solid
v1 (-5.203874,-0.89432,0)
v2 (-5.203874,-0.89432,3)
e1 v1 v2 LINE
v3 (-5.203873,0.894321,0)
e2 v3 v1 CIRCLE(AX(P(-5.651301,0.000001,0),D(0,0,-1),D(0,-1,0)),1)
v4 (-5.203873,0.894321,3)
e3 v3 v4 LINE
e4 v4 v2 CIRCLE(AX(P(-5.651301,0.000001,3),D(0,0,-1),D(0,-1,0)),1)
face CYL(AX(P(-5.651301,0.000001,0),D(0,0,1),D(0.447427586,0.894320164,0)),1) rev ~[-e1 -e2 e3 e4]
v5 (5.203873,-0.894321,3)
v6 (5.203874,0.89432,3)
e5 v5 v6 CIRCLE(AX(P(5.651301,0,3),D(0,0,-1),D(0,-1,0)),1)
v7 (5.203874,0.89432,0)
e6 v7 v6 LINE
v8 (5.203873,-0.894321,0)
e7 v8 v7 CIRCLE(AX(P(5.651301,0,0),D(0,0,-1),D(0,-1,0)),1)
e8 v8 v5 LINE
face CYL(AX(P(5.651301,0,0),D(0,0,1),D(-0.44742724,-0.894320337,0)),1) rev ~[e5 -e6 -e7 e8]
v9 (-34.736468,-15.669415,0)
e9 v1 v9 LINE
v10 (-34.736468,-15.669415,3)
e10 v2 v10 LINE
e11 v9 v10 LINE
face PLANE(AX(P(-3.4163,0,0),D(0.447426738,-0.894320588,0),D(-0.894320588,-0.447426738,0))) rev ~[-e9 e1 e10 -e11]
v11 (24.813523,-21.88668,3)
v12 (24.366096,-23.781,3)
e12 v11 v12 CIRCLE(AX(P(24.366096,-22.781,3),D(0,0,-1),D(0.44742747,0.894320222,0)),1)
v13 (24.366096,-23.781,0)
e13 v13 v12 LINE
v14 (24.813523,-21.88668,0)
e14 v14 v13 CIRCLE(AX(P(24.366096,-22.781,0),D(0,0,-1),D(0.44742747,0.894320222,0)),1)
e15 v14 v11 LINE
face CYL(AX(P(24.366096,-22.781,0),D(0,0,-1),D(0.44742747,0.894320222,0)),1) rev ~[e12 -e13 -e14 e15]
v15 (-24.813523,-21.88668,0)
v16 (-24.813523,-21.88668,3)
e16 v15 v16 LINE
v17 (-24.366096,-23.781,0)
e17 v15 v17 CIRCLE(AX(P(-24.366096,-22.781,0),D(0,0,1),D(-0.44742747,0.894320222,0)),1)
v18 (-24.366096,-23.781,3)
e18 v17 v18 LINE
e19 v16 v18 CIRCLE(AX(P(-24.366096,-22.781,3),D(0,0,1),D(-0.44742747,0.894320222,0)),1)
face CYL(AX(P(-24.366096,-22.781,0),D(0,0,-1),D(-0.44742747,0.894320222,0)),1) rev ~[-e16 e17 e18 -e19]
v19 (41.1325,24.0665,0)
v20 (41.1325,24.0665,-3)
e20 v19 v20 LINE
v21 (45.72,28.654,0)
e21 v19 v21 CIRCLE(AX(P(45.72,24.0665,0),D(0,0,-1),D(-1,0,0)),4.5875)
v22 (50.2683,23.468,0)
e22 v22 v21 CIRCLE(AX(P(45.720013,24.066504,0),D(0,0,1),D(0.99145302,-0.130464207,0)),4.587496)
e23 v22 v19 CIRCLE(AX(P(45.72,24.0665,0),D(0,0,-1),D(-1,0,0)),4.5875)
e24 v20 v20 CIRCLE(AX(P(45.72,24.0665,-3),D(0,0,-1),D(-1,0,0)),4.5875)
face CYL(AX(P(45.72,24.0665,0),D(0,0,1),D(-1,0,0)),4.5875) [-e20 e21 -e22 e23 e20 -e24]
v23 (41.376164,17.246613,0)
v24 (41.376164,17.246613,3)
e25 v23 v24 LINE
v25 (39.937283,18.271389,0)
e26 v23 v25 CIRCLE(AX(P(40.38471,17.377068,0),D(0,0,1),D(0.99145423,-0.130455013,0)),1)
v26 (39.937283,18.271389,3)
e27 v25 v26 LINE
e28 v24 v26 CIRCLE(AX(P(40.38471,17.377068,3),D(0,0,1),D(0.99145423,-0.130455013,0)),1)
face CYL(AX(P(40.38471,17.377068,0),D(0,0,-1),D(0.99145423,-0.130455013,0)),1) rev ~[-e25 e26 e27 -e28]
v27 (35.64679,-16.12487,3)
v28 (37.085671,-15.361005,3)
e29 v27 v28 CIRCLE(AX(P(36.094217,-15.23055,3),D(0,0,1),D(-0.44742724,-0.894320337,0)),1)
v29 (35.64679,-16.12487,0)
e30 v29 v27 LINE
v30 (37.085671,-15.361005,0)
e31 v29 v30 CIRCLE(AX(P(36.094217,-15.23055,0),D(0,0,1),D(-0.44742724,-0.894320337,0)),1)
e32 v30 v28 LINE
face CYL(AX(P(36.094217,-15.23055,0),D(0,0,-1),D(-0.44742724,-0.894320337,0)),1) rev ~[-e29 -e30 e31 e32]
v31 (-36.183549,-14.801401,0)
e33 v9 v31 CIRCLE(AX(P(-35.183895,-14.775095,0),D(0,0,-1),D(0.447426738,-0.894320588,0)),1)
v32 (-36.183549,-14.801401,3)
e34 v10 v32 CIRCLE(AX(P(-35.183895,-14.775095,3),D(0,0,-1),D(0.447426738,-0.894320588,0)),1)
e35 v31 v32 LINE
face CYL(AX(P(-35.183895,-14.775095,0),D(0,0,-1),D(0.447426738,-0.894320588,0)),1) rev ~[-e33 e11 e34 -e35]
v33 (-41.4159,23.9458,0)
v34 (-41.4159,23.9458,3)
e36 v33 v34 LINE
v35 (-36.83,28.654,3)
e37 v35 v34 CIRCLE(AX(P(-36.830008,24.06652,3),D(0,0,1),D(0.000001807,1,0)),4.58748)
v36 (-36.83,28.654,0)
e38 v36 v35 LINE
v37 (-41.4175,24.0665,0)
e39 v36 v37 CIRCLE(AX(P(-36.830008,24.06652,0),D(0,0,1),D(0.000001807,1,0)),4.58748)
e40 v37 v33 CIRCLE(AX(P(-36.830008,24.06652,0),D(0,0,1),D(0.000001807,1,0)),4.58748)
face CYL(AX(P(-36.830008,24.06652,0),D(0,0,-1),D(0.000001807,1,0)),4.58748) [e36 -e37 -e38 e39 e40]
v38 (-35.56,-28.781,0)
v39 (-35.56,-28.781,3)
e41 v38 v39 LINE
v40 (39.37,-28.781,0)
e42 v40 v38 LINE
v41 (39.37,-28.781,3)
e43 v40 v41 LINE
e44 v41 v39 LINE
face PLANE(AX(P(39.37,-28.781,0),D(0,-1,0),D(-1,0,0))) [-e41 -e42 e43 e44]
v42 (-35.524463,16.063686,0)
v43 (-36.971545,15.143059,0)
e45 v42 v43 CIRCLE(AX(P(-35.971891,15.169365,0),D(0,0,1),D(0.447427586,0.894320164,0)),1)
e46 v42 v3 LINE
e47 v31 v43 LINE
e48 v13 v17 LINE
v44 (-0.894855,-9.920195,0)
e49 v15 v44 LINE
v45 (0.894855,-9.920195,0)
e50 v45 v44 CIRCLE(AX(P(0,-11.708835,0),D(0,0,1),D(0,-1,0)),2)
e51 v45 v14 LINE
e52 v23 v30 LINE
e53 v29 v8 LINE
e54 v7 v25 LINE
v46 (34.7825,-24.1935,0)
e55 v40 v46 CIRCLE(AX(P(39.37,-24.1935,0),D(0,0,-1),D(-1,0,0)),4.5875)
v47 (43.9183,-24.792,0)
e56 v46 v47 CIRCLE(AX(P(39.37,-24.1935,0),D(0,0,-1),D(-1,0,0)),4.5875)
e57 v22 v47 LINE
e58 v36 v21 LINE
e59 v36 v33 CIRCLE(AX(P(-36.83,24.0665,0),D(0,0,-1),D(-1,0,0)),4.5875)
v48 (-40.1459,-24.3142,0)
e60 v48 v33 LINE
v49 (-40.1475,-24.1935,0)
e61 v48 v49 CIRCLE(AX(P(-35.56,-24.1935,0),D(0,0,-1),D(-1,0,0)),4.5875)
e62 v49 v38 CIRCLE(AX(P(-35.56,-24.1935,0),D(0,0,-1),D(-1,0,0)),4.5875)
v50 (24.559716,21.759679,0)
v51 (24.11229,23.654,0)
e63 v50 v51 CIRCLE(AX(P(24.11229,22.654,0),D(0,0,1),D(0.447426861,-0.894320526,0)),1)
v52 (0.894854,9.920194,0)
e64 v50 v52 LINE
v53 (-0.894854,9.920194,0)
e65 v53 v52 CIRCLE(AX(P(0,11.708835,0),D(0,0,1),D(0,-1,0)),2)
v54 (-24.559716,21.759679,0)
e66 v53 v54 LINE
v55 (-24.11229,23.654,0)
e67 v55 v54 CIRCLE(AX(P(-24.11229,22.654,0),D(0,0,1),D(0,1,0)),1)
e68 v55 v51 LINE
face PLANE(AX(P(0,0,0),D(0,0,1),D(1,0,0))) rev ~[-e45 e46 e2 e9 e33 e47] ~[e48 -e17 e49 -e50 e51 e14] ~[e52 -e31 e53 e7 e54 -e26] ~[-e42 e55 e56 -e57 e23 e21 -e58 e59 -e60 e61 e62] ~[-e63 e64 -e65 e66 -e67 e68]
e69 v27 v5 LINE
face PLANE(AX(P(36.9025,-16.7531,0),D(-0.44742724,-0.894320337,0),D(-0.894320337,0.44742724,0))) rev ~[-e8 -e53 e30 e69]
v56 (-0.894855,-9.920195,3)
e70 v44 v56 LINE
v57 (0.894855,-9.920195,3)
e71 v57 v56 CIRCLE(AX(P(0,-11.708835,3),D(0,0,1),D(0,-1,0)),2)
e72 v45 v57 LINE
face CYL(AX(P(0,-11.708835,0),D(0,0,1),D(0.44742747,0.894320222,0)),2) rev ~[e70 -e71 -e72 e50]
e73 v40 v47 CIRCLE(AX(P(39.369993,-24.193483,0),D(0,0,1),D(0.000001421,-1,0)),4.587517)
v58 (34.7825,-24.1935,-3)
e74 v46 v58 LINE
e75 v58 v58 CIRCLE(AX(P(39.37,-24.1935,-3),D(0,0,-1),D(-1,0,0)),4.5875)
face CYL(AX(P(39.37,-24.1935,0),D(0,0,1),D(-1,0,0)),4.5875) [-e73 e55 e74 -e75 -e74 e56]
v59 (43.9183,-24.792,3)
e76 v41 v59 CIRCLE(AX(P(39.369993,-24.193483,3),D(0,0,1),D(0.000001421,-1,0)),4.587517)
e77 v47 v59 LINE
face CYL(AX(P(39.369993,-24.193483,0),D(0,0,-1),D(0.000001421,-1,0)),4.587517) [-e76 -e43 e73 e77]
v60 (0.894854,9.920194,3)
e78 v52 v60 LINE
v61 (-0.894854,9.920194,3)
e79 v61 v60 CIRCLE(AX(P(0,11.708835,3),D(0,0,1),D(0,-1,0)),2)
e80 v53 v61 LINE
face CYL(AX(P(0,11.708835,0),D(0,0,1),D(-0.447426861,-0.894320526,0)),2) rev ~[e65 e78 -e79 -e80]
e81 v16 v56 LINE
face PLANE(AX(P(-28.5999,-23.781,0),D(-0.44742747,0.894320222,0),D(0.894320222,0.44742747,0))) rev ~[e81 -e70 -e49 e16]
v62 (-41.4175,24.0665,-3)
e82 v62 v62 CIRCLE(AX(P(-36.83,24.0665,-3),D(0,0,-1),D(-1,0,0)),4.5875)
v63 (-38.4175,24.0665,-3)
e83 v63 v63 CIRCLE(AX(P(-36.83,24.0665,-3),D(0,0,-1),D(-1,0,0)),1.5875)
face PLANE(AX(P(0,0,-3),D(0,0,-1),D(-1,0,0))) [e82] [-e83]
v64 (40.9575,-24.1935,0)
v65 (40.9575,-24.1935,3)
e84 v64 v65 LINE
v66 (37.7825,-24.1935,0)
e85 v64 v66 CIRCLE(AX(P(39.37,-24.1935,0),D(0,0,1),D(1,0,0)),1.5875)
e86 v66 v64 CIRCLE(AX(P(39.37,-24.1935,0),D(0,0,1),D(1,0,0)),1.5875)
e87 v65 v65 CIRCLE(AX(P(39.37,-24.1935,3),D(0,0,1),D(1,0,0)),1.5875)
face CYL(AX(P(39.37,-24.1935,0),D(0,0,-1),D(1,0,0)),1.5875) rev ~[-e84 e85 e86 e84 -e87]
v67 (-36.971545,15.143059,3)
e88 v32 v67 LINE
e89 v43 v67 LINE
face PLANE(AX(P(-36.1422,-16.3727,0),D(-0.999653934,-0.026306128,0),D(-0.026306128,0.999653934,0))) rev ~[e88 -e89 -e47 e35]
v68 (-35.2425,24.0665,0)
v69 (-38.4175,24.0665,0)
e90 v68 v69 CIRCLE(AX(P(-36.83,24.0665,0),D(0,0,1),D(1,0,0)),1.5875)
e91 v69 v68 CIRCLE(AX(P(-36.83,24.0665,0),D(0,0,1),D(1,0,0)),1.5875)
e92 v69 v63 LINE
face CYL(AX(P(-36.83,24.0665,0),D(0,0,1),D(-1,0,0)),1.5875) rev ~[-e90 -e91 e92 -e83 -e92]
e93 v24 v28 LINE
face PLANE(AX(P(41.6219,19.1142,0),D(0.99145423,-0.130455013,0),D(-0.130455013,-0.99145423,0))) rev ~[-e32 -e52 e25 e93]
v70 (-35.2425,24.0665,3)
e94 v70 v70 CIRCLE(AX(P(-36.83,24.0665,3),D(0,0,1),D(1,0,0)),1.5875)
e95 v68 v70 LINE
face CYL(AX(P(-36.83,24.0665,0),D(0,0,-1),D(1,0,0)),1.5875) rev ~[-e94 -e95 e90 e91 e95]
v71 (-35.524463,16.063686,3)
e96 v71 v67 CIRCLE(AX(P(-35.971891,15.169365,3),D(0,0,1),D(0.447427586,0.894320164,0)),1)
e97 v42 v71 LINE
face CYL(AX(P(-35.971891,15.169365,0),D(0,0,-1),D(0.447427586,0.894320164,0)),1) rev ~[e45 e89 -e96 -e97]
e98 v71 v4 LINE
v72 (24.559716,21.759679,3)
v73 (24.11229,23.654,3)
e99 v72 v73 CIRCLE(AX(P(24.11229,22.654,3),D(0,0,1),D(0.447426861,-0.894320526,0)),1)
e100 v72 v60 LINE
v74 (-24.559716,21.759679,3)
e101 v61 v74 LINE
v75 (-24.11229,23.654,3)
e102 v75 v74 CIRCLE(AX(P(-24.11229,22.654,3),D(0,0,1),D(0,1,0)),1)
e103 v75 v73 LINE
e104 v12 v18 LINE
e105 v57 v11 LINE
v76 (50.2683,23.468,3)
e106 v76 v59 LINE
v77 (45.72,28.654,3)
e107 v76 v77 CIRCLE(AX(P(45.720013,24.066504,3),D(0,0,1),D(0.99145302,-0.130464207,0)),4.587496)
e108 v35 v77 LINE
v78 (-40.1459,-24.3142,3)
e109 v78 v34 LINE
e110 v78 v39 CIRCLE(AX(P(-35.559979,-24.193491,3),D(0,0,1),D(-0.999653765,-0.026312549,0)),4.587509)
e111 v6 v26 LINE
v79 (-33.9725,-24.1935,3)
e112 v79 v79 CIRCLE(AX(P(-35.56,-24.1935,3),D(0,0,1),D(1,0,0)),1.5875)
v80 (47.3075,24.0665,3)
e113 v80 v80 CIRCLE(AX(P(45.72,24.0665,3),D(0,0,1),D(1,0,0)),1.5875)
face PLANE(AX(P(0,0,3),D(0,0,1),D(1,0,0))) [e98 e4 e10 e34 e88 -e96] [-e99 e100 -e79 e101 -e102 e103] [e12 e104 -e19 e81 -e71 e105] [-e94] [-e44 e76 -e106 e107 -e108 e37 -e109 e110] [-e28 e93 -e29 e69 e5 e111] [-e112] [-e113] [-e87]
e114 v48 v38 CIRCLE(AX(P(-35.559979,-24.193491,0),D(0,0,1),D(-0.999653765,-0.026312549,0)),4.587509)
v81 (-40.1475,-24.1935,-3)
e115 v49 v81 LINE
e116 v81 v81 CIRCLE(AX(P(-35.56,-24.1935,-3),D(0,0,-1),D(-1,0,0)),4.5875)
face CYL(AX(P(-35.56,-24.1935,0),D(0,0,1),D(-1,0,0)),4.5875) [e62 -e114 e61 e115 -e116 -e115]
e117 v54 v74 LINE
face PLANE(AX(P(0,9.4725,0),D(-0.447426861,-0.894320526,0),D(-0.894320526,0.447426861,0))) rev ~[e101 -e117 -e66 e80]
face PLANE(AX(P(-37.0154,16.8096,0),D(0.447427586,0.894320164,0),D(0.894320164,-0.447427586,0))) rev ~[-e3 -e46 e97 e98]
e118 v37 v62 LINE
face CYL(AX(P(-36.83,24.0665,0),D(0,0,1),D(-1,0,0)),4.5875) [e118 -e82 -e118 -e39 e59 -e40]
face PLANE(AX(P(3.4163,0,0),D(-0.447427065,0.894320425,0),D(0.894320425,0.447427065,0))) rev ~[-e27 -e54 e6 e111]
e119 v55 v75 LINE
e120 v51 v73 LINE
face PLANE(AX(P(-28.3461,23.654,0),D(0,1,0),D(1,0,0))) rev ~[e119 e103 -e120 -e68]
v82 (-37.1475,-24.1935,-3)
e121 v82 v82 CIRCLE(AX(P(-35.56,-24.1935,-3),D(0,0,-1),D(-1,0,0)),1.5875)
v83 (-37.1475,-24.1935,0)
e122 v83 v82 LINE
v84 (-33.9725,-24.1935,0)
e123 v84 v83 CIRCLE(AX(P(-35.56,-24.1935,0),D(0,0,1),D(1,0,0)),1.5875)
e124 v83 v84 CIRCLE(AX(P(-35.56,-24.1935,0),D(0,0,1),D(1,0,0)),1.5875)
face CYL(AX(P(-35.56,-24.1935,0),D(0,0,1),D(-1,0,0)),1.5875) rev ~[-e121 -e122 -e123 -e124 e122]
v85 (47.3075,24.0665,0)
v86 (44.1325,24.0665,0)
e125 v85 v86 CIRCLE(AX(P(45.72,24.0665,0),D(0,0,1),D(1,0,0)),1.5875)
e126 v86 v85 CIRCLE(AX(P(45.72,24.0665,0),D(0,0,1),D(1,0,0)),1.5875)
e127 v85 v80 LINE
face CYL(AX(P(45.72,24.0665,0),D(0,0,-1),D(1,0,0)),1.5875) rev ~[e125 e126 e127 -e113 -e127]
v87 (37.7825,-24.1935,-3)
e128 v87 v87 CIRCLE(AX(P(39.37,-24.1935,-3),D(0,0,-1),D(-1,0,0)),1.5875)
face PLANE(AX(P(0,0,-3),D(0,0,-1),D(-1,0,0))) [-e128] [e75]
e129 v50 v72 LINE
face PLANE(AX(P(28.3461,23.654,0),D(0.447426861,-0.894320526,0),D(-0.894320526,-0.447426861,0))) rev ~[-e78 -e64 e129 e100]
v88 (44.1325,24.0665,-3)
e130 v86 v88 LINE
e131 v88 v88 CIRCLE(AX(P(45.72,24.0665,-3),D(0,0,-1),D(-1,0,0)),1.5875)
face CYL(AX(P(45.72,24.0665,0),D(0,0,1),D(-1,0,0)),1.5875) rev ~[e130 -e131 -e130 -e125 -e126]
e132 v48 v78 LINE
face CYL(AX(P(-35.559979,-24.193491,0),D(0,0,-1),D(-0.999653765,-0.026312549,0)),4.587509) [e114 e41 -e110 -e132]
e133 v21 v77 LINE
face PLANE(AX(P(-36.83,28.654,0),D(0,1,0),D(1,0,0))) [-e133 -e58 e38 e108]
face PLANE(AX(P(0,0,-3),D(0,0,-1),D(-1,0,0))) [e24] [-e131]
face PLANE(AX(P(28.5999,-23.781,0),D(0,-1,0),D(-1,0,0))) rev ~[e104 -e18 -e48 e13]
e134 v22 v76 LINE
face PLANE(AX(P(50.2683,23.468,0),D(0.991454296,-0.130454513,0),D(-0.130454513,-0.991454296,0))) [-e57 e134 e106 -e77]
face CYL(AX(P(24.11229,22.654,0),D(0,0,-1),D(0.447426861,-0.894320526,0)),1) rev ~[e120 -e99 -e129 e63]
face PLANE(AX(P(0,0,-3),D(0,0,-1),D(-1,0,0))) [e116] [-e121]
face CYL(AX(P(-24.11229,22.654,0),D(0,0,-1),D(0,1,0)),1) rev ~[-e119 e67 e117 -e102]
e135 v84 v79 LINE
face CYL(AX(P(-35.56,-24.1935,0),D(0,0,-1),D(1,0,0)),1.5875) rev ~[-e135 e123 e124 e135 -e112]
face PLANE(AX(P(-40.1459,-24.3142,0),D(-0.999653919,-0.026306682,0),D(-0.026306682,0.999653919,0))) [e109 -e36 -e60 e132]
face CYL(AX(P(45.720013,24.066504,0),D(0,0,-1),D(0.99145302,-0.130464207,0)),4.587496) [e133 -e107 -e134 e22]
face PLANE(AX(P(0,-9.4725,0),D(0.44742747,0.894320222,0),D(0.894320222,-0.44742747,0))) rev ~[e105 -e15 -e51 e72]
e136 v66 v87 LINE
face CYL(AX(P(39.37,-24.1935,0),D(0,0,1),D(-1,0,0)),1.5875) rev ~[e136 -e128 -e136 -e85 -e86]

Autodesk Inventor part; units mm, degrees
ref_plane "YZ Plane" through (0, 0, 0) normal (1, 0, 0) x (0, 1, 0)
ref_plane "XZ Plane" through (0, 0, 0) normal (0, 1, 0) x (-1, 0, 0)
ref_plane "XY Plane" through (0, 0, 0) normal (0, 0, 1) x (1, 0, 0)
sketch "Sketch1" plane through (0, 0, 0) normal (0, 0, 1) x (1, 0, 0)
  circle A0 centre (-36.83, 24.0665) radius 1.5875 projected
  circle A1 centre (45.72, 24.0665) radius 1.5875 projected
  circle A2 centre (39.37, -24.1935) radius 1.5875 projected
  circle A3 centre (-35.56, -24.1935) radius 1.5875 projected
  arc A4 (-36.83, 28.654) -> (-41.4159, 23.9458) centre (-36.83, 24.0665) ccw
  arc A5 (-40.1459, -24.3142) -> (-35.56, -28.781) centre (-35.56, -24.1935) ccw
  arc A6 (39.37, -28.781) -> (43.9183, -24.792) centre (39.37, -24.1935) ccw
  arc A7 (50.2683, 23.468) -> (45.72, 28.654) centre (45.72, 24.0665) ccw
  line L0 (50.2683, 23.468) -> (43.9183, -24.792)
  line L1 (39.37, -28.781) -> (-35.56, -28.781)
  line L2 (-40.1459, -24.3142) -> (-41.4159, 23.9458)
  line L3 (-36.83, 28.654) -> (45.72, 28.654)
  point P0 (0, 0)
  dimension "d0" = 3
  dimension "d1" = 3
  dimension "d2" = 3
  dimension "d3" = 3
extrude "Main body" add sketch "Sketch1" along normal blind 3
sketch "Sketch3" plane through (0, 0, 0) normal (0, 0, -1) x (-1, 0, 0)
  circle A0 centre (35.56, -24.1935) radius 1.5875 projected
  circle A1 centre (-39.37, -24.1935) radius 1.5875 projected
  circle A2 centre (-45.72, 24.0665) radius 1.5875 projected
  circle A3 centre (36.83, 24.0665) radius 1.5875 projected
  circle A4 centre (35.56, -24.1935) radius 4.5875
  circle A5 centre (-39.37, -24.1935) radius 4.5875
  circle A6 centre (-45.72, 24.0665) radius 4.5875
  circle A7 centre (36.83, 24.0665) radius 4.5875
  point P0 (0, 0)
  dimension "d7" = 3
  dimension "d8" = 3
  dimension "d9" = 3
  dimension "d10" = 3
extrude "Standoff" add sketch "Sketch3" along normal blind 3
sketch "Sketch4" plane through (0, 0, 0) normal (0, 0, -1) x (-1, 0, 0)
  line L0 (28.3461, 23.654) -> (-28.3461, 23.654)
  line L1 (-28.3461, 23.654) -> (0, 9.4725)
  line L2 (0, 9.4725) -> (28.3461, 23.654)
  line L3 (37.0154, 16.8096) -> (3.4163, 0)
  line L4 (3.4163, 0) -> (36.1422, -16.3727)
  line L5 (36.1422, -16.3727) -> (37.0154, 16.8096)
  line L6 (28.5999, -23.781) -> (0, -9.4725)
  line L7 (0, -9.4725) -> (-28.5999, -23.781)
  line L8 (-28.5999, -23.781) -> (28.5999, -23.781)
  line L9 (35.56, -28.781) -> (-39.37, -28.781) projected
  line L10 (-45.72, 28.654) -> (36.83, 28.654) projected
  line L11 (-3.4163, 0) -> (-41.6219, 19.1142)
  line L12 (-41.6219, 19.1142) -> (-36.9025, -16.7531)
  line L13 (-36.9025, -16.7531) -> (-3.4163, 0)
  line L14 (-3.4163, 0) -> (3.4163, 0) construction
  line L15 (0, -9.4725) -> (0, 9.4725) construction
  line L16 (41.4159, 23.9458) -> (40.1459, -24.3142) construction
  line L17 (-43.9183, -24.792) -> (-50.2683, 23.468) construction
  point P0 (0, 0)
  dimension "d13" = 5
  dimension "d14" = 5
  dimension "d15" = 10
  dimension "d16" = 10
  dimension "d17" = 10
  dimension "d18" = 10
extrude "Extrusion3" cut sketch "Sketch4" against normal up to surface (3 mm away)
fillet "Fillet1" radius 1 8 edges at (-28.3461, 23.654, 1.5) (28.3461, 23.654, 1.5) (41.6219, 19.1142, 1.5) (36.9025, -16.7531, 1.5) (-28.5999, -23.781, 1.5) (-36.1422, -16.3727, 1.5) (-37.0154, 16.8096, 1.5) (28.5999, -23.781, 1.5)
fillet "Fillet2" radius 2 2 edges at (0, -9.4725, 1.5) (0, 9.4725, 1.5)
fillet "Fillet3" radius 1 2 edges at (-3.4163, 0, 1.5) (3.4163, 0, 1.5)
equation "\"d1\" = d0"
equation "\"d2\" = d0"
equation "\"d3\" = d0"
equation "\"d8\" = d7"
equation "\"d9\" = d7"
equation "\"d10\" = d7"
equation "\"d14\" = d13"
equation "\"d16\" = d15"
equation "\"d17\" = d15"
equation "\"d18\" = d15"
properties part number "RampsMount"
